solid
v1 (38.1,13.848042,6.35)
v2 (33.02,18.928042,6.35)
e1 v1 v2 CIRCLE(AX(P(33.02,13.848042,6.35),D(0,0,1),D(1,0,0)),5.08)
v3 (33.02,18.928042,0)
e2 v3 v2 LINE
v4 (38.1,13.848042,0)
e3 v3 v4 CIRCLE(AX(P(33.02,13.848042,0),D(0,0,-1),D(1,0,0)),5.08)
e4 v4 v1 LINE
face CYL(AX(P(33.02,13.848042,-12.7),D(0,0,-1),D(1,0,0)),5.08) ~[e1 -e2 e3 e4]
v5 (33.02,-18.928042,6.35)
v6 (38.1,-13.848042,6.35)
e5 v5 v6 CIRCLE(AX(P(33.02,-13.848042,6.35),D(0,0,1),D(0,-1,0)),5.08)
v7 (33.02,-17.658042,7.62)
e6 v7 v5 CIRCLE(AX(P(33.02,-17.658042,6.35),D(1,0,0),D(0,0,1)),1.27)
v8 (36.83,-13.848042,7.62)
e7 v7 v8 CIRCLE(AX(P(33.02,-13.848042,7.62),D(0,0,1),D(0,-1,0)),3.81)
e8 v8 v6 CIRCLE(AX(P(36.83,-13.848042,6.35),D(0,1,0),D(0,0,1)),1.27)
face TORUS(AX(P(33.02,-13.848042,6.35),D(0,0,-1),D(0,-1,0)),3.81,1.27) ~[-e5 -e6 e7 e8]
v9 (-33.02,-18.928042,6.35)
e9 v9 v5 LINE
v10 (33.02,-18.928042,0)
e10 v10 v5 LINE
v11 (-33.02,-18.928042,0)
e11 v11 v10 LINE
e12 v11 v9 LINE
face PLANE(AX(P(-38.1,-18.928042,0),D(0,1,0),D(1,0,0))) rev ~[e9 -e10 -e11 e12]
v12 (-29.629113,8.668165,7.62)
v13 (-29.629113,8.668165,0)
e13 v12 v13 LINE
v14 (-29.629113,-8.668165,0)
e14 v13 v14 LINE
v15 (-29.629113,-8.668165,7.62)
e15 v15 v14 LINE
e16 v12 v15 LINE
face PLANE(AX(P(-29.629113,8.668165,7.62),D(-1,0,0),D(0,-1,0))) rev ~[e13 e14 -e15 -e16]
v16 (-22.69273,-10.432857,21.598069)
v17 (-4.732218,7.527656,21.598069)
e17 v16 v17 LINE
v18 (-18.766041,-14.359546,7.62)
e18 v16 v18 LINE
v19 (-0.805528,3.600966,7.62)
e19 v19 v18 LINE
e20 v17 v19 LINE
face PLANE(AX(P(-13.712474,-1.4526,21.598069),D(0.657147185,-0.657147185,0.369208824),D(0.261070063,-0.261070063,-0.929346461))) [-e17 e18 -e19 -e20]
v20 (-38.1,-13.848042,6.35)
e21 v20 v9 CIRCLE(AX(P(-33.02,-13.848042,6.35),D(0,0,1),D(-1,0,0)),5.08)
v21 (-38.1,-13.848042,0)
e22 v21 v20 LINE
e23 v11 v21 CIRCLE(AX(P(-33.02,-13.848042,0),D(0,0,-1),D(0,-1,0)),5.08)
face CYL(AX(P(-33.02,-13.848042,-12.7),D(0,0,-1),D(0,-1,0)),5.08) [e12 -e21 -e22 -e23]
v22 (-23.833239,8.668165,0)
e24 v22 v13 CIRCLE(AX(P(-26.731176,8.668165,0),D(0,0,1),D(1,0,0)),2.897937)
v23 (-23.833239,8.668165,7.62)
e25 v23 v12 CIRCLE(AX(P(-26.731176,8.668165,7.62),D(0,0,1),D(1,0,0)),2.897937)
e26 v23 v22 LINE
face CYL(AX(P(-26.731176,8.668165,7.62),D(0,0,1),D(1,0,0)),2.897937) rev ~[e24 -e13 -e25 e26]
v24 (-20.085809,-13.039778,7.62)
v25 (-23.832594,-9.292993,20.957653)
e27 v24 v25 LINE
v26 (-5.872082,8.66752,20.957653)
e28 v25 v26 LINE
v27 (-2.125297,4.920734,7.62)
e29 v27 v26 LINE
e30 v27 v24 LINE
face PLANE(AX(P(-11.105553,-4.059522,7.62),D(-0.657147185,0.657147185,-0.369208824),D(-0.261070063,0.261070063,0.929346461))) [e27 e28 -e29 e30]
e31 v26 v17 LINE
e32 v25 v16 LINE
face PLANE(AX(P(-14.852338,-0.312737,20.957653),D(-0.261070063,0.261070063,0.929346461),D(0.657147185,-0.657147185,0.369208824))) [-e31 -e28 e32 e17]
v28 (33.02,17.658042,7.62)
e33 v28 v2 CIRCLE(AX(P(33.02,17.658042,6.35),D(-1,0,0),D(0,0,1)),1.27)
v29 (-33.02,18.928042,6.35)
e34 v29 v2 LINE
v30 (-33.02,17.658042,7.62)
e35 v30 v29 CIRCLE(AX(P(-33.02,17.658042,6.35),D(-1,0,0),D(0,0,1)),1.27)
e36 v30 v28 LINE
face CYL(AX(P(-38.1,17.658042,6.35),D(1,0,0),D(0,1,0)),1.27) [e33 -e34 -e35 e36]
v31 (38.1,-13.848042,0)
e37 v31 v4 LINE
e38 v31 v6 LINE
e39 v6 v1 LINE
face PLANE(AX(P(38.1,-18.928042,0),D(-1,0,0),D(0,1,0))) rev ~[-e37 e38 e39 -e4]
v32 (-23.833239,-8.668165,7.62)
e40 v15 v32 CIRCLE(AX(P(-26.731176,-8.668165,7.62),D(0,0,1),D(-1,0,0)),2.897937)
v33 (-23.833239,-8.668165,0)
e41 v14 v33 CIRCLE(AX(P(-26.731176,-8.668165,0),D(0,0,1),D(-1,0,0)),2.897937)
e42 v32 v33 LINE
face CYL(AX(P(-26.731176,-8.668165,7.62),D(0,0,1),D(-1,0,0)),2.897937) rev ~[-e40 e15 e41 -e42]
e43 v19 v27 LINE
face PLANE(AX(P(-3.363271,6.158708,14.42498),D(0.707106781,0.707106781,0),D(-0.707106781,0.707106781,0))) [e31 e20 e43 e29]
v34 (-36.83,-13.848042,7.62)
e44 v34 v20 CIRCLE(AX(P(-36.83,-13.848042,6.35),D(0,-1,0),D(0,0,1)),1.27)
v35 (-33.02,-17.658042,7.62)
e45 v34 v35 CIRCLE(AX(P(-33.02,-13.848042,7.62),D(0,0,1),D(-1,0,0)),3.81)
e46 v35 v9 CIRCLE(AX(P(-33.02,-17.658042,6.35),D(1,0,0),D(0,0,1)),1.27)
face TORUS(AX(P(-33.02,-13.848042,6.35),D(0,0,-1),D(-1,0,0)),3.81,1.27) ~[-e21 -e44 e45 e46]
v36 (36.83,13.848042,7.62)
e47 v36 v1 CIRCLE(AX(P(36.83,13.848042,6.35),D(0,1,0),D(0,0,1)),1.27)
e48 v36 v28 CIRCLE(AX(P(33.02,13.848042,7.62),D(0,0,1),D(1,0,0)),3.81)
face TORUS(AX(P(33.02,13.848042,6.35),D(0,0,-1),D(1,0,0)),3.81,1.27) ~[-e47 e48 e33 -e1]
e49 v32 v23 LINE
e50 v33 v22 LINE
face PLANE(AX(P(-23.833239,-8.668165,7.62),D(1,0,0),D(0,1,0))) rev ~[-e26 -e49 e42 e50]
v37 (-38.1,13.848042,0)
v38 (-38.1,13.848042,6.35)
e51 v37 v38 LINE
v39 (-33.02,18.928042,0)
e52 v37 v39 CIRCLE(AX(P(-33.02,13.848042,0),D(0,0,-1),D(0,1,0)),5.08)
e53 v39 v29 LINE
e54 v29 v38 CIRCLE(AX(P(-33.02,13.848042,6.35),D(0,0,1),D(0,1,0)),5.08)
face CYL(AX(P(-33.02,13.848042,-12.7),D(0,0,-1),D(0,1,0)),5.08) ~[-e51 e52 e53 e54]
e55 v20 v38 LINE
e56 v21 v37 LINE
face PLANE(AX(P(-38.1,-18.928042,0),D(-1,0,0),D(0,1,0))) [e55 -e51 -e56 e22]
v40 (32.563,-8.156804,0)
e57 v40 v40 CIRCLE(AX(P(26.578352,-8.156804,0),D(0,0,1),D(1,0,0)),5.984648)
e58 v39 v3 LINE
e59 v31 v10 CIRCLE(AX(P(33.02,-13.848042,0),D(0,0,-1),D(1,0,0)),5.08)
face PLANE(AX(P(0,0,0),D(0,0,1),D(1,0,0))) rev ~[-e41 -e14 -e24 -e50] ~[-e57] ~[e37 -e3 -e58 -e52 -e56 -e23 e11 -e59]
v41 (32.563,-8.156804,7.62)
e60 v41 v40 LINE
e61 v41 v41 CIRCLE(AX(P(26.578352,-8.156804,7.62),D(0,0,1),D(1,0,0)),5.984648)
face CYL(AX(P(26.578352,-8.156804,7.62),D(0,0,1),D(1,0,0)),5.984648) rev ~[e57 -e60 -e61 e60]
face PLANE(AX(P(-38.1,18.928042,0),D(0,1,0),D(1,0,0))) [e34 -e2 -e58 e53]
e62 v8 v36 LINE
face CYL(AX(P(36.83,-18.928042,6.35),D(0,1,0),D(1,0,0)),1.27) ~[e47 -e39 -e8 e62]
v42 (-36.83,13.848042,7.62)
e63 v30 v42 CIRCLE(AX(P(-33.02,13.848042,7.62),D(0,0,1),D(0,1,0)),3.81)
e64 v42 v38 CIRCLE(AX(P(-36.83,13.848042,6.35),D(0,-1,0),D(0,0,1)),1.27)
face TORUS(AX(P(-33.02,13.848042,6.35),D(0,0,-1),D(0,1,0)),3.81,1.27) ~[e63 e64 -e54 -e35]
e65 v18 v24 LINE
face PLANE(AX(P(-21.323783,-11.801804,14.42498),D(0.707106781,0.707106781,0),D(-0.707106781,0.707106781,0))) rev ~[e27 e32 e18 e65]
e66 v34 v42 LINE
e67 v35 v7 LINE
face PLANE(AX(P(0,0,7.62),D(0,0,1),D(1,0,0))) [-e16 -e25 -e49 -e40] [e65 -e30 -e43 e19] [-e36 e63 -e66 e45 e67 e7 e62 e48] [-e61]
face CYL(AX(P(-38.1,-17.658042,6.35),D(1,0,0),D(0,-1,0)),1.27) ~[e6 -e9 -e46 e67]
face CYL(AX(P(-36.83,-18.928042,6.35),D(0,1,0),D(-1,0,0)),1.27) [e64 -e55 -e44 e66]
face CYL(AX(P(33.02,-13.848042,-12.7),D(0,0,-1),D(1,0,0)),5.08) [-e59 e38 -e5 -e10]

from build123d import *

# Parameters (mm, degrees)
F0_W         = 76.2
F0_H         = 37.856084797
F1_DEPTH     = 7.62
F2_R         = 1.27
F3_T1_DEPTH  = 20.32
F3_T4_ANGLE  = 90
F3_T6_ANGLE  = 90
F3_T8_ANGLE  = 90
F3_T10_ANGLE = 90
F5_DEPTH     = 25.4
F6_R         = 5.9846476777
F7_DEPTH     = 25.4
F10_DEPTH    = 12.7


# Not quite as in the source:
# - a fillet or chamfer that OpenCascade refuses, or shapes differently, is made with other operations: its cross-section is extruded or revolved along the edge and cut away or added


with BuildPart() as f1:
    # F0 (on Top) → F1 (new body)
    with BuildSketch(Plane.XY):
        Rectangle(F0_W, F0_H)
    extrude(amount=F1_DEPTH)

    # F2
    f2_edges = [f1.edges().sort_by_distance(p)[0] for p in [
        (-38.1, 0, 7.62),
        (0, 18.928042, 7.62),
        (38.1, 0, 7.62),
        (0, -18.928042, 7.62),
    ]]
    fillet(f2_edges, radius=F2_R)

    # F3: fillet of radius 5.08 on 4 edges, made by hand

    # F3_s2 → F3_t1 (cut)
    with BuildSketch(Plane.XY.offset(-12.7)):
        with BuildLine():
            ThreePointArc((-33.02, -18.9280423985), (-36.6121024484, -17.4401448469), (-38.1, -13.8480423985))
            Line((-38.1, -13.8480423985), (-38.1, -18.9280423985))
            Line((-38.1, -18.9280423985), (-33.02, -18.9280423985))
        make_face()
        with BuildLine():
            ThreePointArc((-33.02, 18.9280423985), (-36.6121024484, 17.4401448469), (-38.1, 13.8480423985))
            Line((-38.1, 13.8480423985), (-38.1, 18.9280423985))
            Line((-38.1, 18.9280423985), (-33.02, 18.9280423985))
        make_face()
        with BuildLine():
            ThreePointArc((38.1, 13.8480423985), (36.6121024484, 17.4401448469), (33.02, 18.9280423985))
            Line((33.02, 18.9280423985), (38.1, 18.9280423985))
            Line((38.1, 18.9280423985), (38.1, 13.8480423985))
        make_face()
        with BuildLine():
            ThreePointArc((38.1, -13.8480423985), (36.6121024484, -17.4401448469), (33.02, -18.9280423985))
            Line((33.02, -18.9280423985), (38.1, -18.9280423985))
            Line((38.1, -18.9280423985), (38.1, -13.8480423985))
        make_face()
    extrude(amount=F3_T1_DEPTH, mode=Mode.SUBTRACT)

    # F3_s3 → F3_t4 (revolve, cut)
    with BuildSketch(Plane.YZ.offset(33.02)):
        with BuildLine():
            ThreePointArc((-17.6580423985, 7.62), (-18.5560680106, 7.2480256121), (-18.9280423985, 6.35))
            Line((-18.9280423985, 6.35), (-18.9280423985, 7.62))
            Line((-18.9280423985, 7.62), (-17.6580423985, 7.62))
        make_face()
    revolve(axis=Axis((33.02, -13.8480423985, 7.62), (0, 0, 1)), revolution_arc=F3_T4_ANGLE, mode=Mode.SUBTRACT)

    # F3_s5 → F3_t6 (revolve, cut)
    with BuildSketch(Plane.XZ.offset(-13.8480423985)):
        with BuildLine():
            ThreePointArc((36.83, 7.62), (37.7280256121, 7.2480256121), (38.1, 6.35))
            Line((38.1, 6.35), (38.1, 7.62))
            Line((38.1, 7.62), (36.83, 7.62))
        make_face()
    revolve(axis=Axis((33.02, 13.8480423985, 7.62), (0, 0, 1)), revolution_arc=F3_T6_ANGLE, mode=Mode.SUBTRACT)

    # F3_s7 → F3_t8 (revolve, cut)
    with BuildSketch(Plane.YZ.offset(-33.02)):
        with BuildLine():
            ThreePointArc((17.6580423985, 7.62), (18.5560680106, 7.2480256121), (18.9280423985, 6.35))
            Line((18.9280423985, 6.35), (18.9280423985, 7.62))
            Line((18.9280423985, 7.62), (17.6580423985, 7.62))
        make_face()
    revolve(axis=Axis((-33.02, 13.8480423985, 7.62), (0, 0, 1)), revolution_arc=F3_T8_ANGLE, mode=Mode.SUBTRACT)

    # F3_s9 → F3_t10 (revolve, cut)
    with BuildSketch(Plane.XZ.offset(13.8480423985)):
        with BuildLine():
            ThreePointArc((-36.83, 7.62), (-37.7280256121, 7.2480256121), (-38.1, 6.35))
            Line((-38.1, 6.35), (-38.1, 7.62))
            Line((-38.1, 7.62), (-36.83, 7.62))
        make_face()
    revolve(axis=Axis((-33.02, -13.8480423985, 7.62), (0, 0, 1)), revolution_arc=F3_T10_ANGLE, mode=Mode.SUBTRACT)

    # F4 (on face) → F5 (cut)
    with BuildSketch(Plane.XY.offset(7.62)):
        with BuildLine():
            Line((-29.6291131526, 8.6681647226), (-29.6291131526, 0))
            Line((-29.6291131526, 0), (-29.6291131526, -8.6681647226))
            ThreePointArc((-29.6291131526, -8.6681647226), (-26.7311763018, -11.5661015734), (-23.8332394511, -8.6681647226))
            Line((-23.8332394511, -8.6681647226), (-23.8332394511, 0))
            Line((-23.8332394511, 0), (-23.8332394511, 8.6681647226))
            ThreePointArc((-23.8332394511, 8.6681647226), (-26.7311763018, 11.5661015734), (-29.6291131526, 8.6681647226))
        make_face()
    extrude(amount=-F5_DEPTH, mode=Mode.SUBTRACT)

    # F6 (on face) → F7 (cut)
    with BuildSketch(Plane.XY.offset(7.62)):
        with Locations((26.5783518553, -8.1568043679)):
            Circle(F6_R)
    extrude(amount=-F7_DEPTH, mode=Mode.SUBTRACT)

    # F9 (on face) → F10 (join, symmetric)
    with BuildSketch(Plane(origin=(-7.5825373642, -7.5825373642, 0), x_dir=(-0.7071067812, 0.7071067812, 0), z_dir=(0.7071067812, 0.7071067812, 0))):
        Polygon((4.9822961397, 7.62), (10.2810509175, 20.9576525145), (8.66903996, 21.5980688662), (3.1158619095, 7.62), align=None)
    extrude(amount=F10_DEPTH, both=True)


solid = f1.part
